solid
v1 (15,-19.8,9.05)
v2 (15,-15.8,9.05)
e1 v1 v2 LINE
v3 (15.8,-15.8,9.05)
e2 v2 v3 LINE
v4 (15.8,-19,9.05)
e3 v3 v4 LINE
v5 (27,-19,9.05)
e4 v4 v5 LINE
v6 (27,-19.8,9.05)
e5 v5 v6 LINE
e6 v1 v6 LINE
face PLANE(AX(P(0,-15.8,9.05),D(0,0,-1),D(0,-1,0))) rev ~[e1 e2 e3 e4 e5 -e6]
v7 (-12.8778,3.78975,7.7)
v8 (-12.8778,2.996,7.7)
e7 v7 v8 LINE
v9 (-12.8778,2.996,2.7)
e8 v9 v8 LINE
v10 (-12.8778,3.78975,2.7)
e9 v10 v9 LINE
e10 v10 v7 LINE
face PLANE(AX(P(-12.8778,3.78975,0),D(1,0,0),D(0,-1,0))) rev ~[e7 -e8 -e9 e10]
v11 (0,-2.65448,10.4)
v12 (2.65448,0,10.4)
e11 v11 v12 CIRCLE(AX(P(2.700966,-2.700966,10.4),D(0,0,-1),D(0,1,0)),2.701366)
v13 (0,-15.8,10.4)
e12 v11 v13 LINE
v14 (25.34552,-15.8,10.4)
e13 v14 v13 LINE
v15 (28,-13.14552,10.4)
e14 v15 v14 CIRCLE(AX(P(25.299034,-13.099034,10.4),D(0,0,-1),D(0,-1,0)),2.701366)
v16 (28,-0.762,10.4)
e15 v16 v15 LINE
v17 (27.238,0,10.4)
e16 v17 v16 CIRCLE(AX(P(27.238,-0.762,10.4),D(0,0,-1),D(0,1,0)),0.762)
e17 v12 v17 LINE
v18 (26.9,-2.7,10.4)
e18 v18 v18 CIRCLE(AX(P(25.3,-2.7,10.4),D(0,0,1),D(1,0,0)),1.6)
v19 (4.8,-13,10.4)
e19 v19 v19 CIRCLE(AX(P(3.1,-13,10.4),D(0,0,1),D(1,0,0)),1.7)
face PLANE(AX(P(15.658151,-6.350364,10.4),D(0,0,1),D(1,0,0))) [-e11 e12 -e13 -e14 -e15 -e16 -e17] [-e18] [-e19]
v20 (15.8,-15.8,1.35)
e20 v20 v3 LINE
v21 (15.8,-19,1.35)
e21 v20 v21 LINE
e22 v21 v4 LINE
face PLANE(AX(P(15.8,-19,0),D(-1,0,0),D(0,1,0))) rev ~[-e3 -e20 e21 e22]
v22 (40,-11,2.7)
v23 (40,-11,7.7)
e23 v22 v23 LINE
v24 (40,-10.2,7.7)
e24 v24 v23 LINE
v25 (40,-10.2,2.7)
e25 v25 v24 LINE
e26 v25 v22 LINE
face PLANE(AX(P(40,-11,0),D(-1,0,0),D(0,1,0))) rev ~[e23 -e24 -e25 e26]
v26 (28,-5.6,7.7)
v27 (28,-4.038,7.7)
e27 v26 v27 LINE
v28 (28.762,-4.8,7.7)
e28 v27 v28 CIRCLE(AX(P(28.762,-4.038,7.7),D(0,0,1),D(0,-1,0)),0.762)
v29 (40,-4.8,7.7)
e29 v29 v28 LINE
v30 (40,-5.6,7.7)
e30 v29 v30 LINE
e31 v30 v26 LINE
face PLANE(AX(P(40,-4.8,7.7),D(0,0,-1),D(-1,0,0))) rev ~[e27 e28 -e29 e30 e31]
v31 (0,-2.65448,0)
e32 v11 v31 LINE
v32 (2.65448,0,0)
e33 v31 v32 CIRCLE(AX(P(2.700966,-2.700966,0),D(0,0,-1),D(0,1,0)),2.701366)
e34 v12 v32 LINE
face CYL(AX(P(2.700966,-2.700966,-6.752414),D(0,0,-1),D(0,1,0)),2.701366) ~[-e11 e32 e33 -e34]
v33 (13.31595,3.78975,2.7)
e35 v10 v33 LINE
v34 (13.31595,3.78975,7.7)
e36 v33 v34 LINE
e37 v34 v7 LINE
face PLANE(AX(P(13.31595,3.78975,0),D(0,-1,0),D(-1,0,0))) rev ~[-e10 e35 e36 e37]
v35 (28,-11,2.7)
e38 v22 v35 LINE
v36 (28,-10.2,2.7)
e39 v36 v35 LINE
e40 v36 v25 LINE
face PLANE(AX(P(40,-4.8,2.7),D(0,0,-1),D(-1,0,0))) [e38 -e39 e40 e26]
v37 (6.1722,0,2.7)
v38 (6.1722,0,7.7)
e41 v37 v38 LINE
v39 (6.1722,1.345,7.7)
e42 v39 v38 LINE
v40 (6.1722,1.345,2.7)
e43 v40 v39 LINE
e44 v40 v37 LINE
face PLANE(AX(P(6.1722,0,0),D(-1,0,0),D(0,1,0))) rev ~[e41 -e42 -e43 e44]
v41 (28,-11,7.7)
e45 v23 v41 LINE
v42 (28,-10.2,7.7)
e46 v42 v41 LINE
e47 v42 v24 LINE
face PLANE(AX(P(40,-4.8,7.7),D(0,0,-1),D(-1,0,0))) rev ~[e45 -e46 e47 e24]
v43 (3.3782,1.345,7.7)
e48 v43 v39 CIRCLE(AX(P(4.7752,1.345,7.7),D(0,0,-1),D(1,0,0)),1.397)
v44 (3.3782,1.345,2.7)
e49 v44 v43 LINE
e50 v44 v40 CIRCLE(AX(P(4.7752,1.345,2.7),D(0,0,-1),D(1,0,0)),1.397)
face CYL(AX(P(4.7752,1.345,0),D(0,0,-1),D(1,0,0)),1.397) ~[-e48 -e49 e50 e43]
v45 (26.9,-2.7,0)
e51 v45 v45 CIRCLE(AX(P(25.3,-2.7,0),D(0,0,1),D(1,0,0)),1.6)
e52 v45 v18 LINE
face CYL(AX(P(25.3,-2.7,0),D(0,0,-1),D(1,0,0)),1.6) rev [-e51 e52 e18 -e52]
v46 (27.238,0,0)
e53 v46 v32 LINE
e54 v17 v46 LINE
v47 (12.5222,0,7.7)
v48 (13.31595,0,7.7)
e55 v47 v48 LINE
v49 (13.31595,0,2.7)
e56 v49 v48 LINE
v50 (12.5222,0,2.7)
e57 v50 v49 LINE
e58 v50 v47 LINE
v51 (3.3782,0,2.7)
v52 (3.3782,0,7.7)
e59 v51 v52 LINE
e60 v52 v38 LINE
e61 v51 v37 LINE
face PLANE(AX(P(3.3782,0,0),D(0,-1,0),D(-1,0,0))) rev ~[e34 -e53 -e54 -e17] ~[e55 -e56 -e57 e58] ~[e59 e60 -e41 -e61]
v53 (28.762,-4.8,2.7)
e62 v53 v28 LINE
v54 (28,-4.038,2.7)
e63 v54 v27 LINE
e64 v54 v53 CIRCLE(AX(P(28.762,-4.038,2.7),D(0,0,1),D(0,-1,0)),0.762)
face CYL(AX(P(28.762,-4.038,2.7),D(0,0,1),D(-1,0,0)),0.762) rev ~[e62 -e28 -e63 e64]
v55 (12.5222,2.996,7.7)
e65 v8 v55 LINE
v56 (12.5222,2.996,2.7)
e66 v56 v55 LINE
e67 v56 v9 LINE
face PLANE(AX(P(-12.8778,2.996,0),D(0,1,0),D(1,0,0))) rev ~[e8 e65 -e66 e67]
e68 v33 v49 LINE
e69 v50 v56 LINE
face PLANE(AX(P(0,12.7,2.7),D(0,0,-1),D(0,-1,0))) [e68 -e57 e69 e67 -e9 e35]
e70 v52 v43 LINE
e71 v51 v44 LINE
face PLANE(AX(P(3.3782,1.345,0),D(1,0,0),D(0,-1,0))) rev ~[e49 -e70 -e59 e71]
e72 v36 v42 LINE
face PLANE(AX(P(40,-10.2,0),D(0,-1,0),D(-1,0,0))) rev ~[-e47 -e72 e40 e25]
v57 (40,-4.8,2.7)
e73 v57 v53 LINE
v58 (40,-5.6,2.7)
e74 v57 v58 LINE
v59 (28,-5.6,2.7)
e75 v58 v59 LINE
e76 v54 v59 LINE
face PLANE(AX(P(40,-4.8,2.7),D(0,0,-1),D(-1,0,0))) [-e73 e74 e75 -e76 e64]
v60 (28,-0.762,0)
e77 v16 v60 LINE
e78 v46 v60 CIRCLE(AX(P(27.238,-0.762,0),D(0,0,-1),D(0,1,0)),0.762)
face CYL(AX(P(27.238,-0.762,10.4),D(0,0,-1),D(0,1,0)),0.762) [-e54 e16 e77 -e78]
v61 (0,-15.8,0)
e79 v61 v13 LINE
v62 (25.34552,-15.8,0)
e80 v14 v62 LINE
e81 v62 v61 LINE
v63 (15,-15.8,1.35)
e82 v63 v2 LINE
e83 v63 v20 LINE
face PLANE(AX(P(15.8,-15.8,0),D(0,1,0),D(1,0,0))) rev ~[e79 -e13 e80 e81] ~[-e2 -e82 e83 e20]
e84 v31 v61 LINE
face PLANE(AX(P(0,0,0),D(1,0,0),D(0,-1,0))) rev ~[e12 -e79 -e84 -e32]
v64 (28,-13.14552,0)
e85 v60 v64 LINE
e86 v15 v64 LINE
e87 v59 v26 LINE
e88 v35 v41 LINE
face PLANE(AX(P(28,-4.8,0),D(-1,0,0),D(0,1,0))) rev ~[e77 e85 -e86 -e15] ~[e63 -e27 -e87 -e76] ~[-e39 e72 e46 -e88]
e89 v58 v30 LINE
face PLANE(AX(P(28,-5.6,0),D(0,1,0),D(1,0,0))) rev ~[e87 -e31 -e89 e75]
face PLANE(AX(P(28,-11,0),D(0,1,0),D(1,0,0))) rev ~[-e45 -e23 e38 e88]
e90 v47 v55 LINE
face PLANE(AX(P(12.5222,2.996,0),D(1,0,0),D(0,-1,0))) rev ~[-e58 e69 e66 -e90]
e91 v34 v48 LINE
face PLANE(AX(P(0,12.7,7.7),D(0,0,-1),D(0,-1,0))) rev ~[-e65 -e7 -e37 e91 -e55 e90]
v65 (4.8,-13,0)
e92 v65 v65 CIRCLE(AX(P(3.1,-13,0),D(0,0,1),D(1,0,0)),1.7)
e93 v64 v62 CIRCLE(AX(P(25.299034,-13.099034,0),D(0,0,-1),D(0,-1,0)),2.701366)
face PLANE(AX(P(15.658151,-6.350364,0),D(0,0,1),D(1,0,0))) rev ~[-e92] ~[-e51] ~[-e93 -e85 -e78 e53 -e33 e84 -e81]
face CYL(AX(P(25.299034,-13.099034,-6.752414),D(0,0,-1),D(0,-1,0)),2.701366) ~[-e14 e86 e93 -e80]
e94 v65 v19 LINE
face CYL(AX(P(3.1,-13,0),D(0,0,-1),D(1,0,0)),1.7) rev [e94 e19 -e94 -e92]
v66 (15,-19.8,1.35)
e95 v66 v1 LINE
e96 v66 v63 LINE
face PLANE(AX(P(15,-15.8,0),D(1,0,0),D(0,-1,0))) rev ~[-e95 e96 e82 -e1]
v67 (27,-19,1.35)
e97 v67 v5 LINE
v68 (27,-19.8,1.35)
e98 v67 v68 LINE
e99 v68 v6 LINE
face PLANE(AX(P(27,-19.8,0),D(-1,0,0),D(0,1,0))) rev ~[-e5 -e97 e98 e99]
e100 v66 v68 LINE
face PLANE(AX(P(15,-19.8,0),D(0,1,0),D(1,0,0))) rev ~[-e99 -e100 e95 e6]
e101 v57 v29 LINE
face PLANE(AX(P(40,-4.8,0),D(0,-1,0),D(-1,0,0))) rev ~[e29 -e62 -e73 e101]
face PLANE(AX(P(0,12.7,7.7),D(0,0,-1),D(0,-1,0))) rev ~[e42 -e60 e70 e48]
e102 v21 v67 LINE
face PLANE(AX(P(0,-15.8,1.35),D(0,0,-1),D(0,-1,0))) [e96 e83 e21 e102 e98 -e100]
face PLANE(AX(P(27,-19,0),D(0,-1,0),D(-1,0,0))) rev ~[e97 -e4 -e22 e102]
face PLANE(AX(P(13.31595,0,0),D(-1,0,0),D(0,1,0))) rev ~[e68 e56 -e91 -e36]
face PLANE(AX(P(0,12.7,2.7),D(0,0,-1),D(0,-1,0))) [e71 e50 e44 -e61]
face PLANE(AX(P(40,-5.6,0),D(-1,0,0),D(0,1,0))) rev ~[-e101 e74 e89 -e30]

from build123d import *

# Parameters (mm, degrees)
F0_R          = 1.7
F0_R_2        = 1.6
F1_DEPTH      = 10.4
F2_W          = 12.7
F2_H          = 2.7
F2_W_2        = 4
F2_H_2        = 1.35
F3_DEPTH      = 28
F3_DEPTH_BACK = 12.8778
F4_W          = 12
F4_H          = 2.7
F5_DEPTH      = 6.2
F6_T1_DEPTH   = 23.9048285752
F7_R          = 0.762


# Not quite as in the source:
# - a fillet or chamfer that OpenCascade refuses, or shapes differently, is made with other operations: its cross-section is extruded or revolved along the edge and cut away or added
# - a feature names something its author has since deleted; it is built from what else it names


with BuildPart() as f1:
    # F0 (on Top) → F1 (new body)
    with BuildSketch(Plane.XY):
        with BuildLine():
            Line((3.3782, 0), (0, 0))
            Line((0, 0), (0, -15.8))
            Line((0, -15.8), (15, -15.8))
            Line((15, -15.8), (15, -19.8))
            Line((15, -19.8), (27, -19.8))
            Line((27, -19.8), (27, -19))
            Line((27, -19), (15.8, -19))
            Line((15.8, -19), (15.8, -15.8))
            Line((15.8, -15.8), (28, -15.8))
            Line((28, -15.8), (28, -11))
            Line((28, -11), (40, -11))
            Line((40, -11), (40, -10.2))
            Line((40, -10.2), (28, -10.2))
            Line((28, -10.2), (28, -5.6))
            Line((28, -5.6), (40, -5.6))
            Line((40, -5.6), (40, -4.8))
            Line((40, -4.8), (28, -4.8))
            Line((28, -4.8), (28, 0))
            Line((28, 0), (13.31595, 0))
            Line((13.31595, 0), (13.31595, 3.78975))
            Line((13.31595, 3.78975), (-12.8778, 3.78975))
            Line((-12.8778, 3.78975), (-12.8778, 2.996))
            Line((-12.8778, 2.996), (12.5222, 2.996))
            Line((12.5222, 2.996), (12.5222, 0))
            Line((12.5222, 0), (6.1722, 0))
            Line((6.1722, 0), (6.1722, 1.345))
            ThreePointArc((6.1722, 1.345), (4.7752, 2.742), (3.3782, 1.345))
            Line((3.3782, 1.345), (3.3782, 0))
        make_face()
        with Locations((3.1, -13)):
            Circle(F0_R, mode=Mode.SUBTRACT)
        with Locations((25.3, -2.7)):
            Circle(F0_R_2, mode=Mode.SUBTRACT)
    extrude(amount=F1_DEPTH)

    # F2 (on face) → F3 (cut, two sides)
    with BuildSketch(Plane(origin=(0, 0, 0), x_dir=(0, -1, 0), z_dir=(-1, 0, 0))) as f3_sk:
        with Locations((-6.35, 9.05)):
            Rectangle(F2_W, F2_H)
        with Locations((-6.35, 1.35)):
            Rectangle(F2_W, F2_H)
        with Locations((17.8, 9.725)):
            Rectangle(F2_W_2, F2_H_2)
        with Locations((17.8, 0.675)):
            Rectangle(F2_W_2, F2_H_2)
    extrude(amount=-F3_DEPTH, mode=Mode.SUBTRACT)
    extrude(f3_sk.sketch, amount=F3_DEPTH_BACK, mode=Mode.SUBTRACT)

    # F4 (on face) → F5 (cut, through all)
    with BuildSketch(Plane(origin=(0, -4.8, 0), x_dir=(-1, 0, 0), z_dir=(0, 1, 0))):
        with Locations((-34, 9.05)):
            Rectangle(F4_W, F4_H)
        with Locations((-34, 1.35)):
            Rectangle(F4_W, F4_H)
    extrude(amount=-F5_DEPTH, mode=Mode.SUBTRACT)

    # F6: fillet of radius 2.7 on 3 edges, made by hand

    # F6_s2 → F6_t1 (cut)
    with BuildSketch(Plane.XY.offset(-6.7524142876)):
        with BuildLine():
            ThreePointArc((25.2990343146, -15.8004), (27.2091883092, -15.0091883092), (28.0004, -13.0990343146))
            Line((28.0004, -13.0990343146), (28.2705365685, -13.0990343146))
            ThreePointArc((28.2705365685, -13.0990343146), (28.2701365685, -14.4495171573), (28.2701365685, -15.8))
            Line((28.2701365685, -15.8), (28, -16.0701365685))
            ThreePointArc((28, -16.0701365685), (26.6495171573, -16.0701365685), (25.2990343146, -16.0705365685))
            Line((25.2990343146, -16.0705365685), (25.2990343146, -15.8004))
        make_face()
        with BuildLine():
            ThreePointArc((2.7009656854, 0.0004), (0.7908116908, -0.7908116908), (-0.0004, -2.7009656854))
            Line((-0.0004, -2.7009656854), (-0.2705365685, -2.7009656854))
            ThreePointArc((-0.2705365685, -2.7009656854), (-0.2701365685, -1.3504828427), (-0.2701365685, 0))
            Line((-0.2701365685, 0), (0, 0.2701365685))
            ThreePointArc((0, 0.2701365685), (1.3504828427, 0.2701365685), (2.7009656854, 0.2705365685))
            Line((2.7009656854, 0.2705365685), (2.7009656854, 0.0004))
        make_face()
    extrude(amount=F6_T1_DEPTH, mode=Mode.SUBTRACT)

    # F7
    f7_edges = [f1.edges().sort_by_distance(p)[0] for p in [
        (28, 0, 5.2),
        (28, -4.8, 5.2),
    ]]
    fillet(f7_edges, radius=F7_R)


solid = f1.part
